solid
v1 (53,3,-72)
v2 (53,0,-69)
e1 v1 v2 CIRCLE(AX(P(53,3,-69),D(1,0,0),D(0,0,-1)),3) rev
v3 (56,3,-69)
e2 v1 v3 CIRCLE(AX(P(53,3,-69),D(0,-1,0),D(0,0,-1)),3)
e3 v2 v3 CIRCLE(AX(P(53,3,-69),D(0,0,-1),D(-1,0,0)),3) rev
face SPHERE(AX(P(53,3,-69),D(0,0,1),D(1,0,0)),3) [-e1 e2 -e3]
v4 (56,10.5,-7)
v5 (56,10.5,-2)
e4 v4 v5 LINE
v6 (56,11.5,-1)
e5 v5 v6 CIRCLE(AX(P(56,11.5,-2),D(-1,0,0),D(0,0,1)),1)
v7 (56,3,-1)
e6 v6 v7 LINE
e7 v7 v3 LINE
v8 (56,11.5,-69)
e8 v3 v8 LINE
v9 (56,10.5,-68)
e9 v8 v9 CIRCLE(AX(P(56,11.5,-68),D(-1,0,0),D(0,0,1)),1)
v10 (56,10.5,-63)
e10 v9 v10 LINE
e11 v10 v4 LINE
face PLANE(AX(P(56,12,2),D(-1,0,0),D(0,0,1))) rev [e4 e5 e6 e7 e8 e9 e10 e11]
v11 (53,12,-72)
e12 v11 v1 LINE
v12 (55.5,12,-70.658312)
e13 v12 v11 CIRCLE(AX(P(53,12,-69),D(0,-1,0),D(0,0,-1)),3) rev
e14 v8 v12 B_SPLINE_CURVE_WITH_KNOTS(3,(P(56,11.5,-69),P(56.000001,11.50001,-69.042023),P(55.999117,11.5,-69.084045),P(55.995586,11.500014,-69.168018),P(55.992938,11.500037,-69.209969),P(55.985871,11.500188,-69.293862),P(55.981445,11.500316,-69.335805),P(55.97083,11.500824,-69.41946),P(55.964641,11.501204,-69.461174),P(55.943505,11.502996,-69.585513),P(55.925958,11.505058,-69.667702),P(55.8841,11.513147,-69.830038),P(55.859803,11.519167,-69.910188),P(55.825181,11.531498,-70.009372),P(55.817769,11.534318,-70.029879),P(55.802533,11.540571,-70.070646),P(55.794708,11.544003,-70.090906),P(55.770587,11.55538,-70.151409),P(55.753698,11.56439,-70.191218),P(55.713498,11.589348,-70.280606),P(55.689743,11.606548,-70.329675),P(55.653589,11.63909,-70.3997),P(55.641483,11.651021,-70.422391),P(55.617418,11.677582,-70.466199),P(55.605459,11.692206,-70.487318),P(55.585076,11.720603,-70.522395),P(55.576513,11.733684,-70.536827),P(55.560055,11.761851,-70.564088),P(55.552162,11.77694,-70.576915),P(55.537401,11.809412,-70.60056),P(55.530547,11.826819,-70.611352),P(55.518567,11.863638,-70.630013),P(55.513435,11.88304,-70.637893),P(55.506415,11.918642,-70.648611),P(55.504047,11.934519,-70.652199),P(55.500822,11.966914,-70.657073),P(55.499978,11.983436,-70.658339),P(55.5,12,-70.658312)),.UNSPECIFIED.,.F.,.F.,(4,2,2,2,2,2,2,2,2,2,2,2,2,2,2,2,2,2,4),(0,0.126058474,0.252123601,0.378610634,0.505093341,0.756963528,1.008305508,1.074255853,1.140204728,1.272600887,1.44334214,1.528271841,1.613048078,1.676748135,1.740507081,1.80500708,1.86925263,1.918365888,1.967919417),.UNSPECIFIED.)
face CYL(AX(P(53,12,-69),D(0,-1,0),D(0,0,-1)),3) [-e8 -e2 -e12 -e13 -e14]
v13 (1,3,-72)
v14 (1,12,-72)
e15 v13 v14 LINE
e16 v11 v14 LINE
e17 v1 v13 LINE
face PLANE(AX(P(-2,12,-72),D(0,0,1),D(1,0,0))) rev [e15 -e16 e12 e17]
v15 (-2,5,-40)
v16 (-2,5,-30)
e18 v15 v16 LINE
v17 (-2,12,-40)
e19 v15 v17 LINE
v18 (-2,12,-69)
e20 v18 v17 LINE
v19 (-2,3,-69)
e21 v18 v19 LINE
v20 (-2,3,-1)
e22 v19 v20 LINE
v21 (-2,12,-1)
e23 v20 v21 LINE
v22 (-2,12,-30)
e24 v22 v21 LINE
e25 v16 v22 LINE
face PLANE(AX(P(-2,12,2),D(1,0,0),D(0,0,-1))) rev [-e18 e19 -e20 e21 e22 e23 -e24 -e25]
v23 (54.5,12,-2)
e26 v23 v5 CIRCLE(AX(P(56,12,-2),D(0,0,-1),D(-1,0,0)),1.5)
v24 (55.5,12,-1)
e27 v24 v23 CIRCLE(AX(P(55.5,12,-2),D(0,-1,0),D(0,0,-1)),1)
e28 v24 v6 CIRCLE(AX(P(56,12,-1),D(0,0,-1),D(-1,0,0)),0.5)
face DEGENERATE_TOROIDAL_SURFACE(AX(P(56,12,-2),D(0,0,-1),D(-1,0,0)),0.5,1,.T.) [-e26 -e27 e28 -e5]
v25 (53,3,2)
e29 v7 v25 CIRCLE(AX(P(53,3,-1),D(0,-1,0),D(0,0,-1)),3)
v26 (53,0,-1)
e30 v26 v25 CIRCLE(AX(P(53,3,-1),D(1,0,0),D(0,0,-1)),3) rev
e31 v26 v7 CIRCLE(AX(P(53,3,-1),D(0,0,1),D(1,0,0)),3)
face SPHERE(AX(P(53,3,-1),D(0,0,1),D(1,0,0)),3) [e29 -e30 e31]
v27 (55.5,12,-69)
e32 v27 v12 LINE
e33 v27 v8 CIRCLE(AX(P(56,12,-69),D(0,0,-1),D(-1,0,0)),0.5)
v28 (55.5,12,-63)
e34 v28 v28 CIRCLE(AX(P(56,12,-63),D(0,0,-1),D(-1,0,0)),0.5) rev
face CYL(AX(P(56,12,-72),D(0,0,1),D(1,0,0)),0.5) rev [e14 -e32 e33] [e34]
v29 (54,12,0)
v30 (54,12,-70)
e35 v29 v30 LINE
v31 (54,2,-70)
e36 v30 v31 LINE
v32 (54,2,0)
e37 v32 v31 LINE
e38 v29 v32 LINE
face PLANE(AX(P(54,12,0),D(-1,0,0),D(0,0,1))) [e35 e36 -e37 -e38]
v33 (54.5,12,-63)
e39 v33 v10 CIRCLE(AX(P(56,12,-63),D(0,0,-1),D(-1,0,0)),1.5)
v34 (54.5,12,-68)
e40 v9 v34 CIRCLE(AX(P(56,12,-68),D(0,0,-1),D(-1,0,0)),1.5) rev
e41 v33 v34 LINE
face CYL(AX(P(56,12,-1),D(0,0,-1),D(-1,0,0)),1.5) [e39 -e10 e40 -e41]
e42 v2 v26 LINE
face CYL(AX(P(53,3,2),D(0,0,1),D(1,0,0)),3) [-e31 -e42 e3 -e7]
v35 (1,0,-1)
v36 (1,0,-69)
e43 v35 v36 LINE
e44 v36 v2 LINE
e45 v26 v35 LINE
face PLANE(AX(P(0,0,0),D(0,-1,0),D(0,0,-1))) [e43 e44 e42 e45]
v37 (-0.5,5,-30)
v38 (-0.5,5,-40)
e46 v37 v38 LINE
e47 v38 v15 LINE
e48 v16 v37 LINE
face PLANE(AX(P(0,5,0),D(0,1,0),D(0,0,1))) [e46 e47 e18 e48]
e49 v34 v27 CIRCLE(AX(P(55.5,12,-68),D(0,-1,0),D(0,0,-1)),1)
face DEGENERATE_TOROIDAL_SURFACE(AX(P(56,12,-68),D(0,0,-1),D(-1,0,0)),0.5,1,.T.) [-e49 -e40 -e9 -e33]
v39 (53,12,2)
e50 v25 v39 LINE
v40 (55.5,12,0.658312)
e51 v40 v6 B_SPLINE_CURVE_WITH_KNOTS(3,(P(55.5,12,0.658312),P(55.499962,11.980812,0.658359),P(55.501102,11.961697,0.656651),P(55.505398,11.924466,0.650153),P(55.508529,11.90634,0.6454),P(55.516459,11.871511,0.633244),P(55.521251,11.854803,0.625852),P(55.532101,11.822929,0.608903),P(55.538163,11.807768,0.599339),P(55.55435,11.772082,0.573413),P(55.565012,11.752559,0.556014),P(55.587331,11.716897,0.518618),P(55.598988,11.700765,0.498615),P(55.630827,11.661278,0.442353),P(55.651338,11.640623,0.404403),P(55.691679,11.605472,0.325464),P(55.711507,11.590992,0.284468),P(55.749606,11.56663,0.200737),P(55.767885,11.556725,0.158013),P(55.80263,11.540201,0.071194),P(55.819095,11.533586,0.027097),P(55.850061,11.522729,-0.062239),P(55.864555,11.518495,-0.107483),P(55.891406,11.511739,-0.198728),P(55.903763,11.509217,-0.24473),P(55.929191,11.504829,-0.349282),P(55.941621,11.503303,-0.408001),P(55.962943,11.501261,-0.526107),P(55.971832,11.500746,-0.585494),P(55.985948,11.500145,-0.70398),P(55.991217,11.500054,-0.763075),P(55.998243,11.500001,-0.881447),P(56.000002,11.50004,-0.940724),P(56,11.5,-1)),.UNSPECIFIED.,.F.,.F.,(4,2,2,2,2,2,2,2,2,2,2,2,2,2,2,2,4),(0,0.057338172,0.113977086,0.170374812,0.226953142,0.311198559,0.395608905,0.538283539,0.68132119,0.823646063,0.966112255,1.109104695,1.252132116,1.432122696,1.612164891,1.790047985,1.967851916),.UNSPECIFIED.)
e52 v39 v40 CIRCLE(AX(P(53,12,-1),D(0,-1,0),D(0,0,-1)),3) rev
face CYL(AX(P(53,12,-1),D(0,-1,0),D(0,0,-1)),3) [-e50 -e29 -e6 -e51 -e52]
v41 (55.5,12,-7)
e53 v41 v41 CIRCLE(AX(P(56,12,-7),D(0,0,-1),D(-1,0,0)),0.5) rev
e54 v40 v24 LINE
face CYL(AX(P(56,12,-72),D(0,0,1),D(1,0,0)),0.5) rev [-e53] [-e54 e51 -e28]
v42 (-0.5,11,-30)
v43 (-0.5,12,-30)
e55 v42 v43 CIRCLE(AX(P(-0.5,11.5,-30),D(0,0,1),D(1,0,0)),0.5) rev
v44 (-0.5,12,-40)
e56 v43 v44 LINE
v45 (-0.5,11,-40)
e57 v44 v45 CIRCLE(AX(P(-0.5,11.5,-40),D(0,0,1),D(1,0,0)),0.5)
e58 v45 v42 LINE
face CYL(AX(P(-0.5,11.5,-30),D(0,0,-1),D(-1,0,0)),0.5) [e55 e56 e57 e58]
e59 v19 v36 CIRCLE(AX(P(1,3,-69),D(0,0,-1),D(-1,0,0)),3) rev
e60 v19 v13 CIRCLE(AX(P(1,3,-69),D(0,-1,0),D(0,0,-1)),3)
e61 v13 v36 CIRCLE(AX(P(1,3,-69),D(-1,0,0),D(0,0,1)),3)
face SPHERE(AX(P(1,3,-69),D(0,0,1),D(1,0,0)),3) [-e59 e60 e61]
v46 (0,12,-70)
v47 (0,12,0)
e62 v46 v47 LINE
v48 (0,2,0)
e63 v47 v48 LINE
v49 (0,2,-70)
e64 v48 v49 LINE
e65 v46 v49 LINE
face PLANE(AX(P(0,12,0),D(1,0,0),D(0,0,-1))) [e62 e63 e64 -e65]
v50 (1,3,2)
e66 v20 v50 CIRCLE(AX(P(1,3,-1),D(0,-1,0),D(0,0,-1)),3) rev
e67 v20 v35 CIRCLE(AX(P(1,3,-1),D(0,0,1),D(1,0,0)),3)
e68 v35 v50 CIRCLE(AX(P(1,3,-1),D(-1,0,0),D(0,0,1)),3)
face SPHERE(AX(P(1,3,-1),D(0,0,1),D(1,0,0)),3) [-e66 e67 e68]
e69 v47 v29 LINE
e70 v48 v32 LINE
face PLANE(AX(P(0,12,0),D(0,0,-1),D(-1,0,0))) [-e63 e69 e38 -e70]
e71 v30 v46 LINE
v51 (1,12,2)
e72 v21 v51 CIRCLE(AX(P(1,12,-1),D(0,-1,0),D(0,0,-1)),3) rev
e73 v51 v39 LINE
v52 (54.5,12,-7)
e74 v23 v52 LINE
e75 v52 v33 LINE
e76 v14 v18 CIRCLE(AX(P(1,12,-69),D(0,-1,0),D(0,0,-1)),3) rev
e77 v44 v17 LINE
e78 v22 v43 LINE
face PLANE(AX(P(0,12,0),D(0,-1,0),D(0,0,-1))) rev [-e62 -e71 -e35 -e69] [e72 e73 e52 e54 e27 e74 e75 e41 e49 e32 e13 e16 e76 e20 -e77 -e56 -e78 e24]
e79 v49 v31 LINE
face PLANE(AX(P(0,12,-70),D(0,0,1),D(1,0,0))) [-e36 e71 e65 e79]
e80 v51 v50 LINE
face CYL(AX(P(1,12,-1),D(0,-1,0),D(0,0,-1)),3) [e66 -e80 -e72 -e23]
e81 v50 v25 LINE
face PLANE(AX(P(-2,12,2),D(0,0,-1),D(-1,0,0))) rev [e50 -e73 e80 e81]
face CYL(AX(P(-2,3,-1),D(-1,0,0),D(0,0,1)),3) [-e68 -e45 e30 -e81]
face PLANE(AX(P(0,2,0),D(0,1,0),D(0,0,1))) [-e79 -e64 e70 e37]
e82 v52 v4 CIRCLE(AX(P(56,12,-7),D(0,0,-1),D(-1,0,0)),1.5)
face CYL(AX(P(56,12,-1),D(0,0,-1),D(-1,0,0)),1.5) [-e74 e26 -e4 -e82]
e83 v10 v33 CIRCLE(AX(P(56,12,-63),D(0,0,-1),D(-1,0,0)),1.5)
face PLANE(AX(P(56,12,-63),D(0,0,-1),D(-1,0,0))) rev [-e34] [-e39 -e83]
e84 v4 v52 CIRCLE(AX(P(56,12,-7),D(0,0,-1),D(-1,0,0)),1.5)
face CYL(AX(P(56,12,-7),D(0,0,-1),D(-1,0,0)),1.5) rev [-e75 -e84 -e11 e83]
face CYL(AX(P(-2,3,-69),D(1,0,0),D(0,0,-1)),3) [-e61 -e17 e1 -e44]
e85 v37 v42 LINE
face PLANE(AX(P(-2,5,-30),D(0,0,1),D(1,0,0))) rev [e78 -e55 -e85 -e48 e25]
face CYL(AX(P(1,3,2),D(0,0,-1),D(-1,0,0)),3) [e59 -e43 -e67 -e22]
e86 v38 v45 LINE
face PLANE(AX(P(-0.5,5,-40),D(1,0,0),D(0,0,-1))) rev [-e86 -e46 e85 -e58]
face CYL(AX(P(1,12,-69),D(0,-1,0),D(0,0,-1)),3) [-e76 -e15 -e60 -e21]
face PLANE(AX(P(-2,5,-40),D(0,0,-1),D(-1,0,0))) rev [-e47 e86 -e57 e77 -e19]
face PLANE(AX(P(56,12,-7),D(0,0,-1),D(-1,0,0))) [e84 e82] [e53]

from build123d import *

# Parameters (mm, degrees)
BOTTOM_W                 = 58
BOTTOM_H                 = 74
BOTTOM_W_2               = 54
BOTTOM_H_2               = 70
DUVAR_DEPTH              = 12
BOTTOM_2_W               = 54
BOTTOM_2_H               = 70
TABAN_DEPTH              = 2
FILLET2_R                = 3
MENTESE_OUT_R            = 1.5
MENTESE_DEPTH            = 68
MENTESE_DELIK_DEPTH      = 93.355292214
MENTESE_DELIK_DEPTH_BACK = 93.355292214
MENTESE_IN_R             = 0.5
MENTESE_FILLET_R         = 1
MENTESE_OUT_CUT_R        = 1.5
MENTESE_BOSLUK_DEPTH     = 56
CENTIK_W                 = 1.5
CENTIK_H                 = 10
CENTIK_BOSLUK_DEPTH      = 7
DIL_R                    = 0.5
BOSS_EXTRUDE5_DEPTH      = 10


with BuildPart() as part:
    # bottom → duvar (new body)
    with BuildSketch(Plane(origin=(0, 0, 0), x_dir=(1, 0, 0), z_dir=(0, 1, 0))):
        with Locations((27, 35)):
            Rectangle(BOTTOM_W, BOTTOM_H)
        with Locations((27, 35)):
            Rectangle(BOTTOM_W_2, BOTTOM_H_2, mode=Mode.SUBTRACT)
    extrude(amount=DUVAR_DEPTH)

    # bottom<2> → taban (add)
    with BuildSketch(Plane(origin=(0, 0, 0), x_dir=(1, 0, 0), z_dir=(0, 1, 0))):
        with Locations((27, 35)):
            Rectangle(BOTTOM_2_W, BOTTOM_2_H)
    extrude(amount=TABAN_DEPTH)

    # Fillet2
    fillet2_edges = [part.edges().sort_by_distance(p)[0] for p in [
        (27, 0, -72),
        (56, 0, -35),
        (27, 0, 2),
        (-2, 0, -35),
        (-2, 6, -72),
        (56, 6, -72),
        (56, 6, 2),
        (-2, 6, 2),
    ]]
    fillet(fillet2_edges, radius=FILLET2_R)

    # mentese out → mentese (add)
    with BuildSketch(Plane(origin=(0, 0, -69), x_dir=(-1, 0, 0), z_dir=(0, 0, -1))):
        with Locations((-56, 12)):
            Circle(MENTESE_OUT_R)
    extrude(amount=-MENTESE_DEPTH)

    # mentese in → mentese delik (cut, two sides: drawn at the far end of the back side and taken through both)
    with BuildSketch(Plane.XY.offset(-1).offset(-MENTESE_DELIK_DEPTH_BACK)):
        with Locations(Location((56, 12, 0), (0, 0, 270))):
            Circle(MENTESE_IN_R)
    extrude(amount=MENTESE_DELIK_DEPTH + MENTESE_DELIK_DEPTH_BACK, mode=Mode.SUBTRACT)

    # mentese fillet
    mentese_fillet_edges = [part.edges().sort_by_distance(p)[0] for p in [
        (57.060660172, 13.060660172, -69),
        (57.060660172, 13.060660172, -1),
    ]]
    fillet(mentese_fillet_edges, radius=MENTESE_FILLET_R - 0.0001)  # a hair under: the kernel refuses the full size

    # mentese out cut → mentese bosluk (cut)
    with BuildSketch(Plane(origin=(0, 0, -63), x_dir=(-1, 0, 0), z_dir=(0, 0, -1))):
        with Locations((-56, 12)):
            Circle(MENTESE_OUT_CUT_R)
    extrude(amount=-MENTESE_BOSLUK_DEPTH, mode=Mode.SUBTRACT)

    # centik → centik bosluk (cut)
    with BuildSketch(Plane(origin=(0, 12, 0), x_dir=(1, 0, 0), z_dir=(0, 1, 0))):
        with Locations((-1.25, 35)):
            Rectangle(CENTIK_W, CENTIK_H)
    extrude(amount=-CENTIK_BOSLUK_DEPTH, mode=Mode.SUBTRACT)

    # dil → Boss-Extrude5 (add)
    with BuildSketch(Plane.XY.offset(-40)):
        with Locations((-0.5, 11.5)):
            Circle(DIL_R)
    extrude(amount=BOSS_EXTRUDE5_DEPTH)


solid = part.part
